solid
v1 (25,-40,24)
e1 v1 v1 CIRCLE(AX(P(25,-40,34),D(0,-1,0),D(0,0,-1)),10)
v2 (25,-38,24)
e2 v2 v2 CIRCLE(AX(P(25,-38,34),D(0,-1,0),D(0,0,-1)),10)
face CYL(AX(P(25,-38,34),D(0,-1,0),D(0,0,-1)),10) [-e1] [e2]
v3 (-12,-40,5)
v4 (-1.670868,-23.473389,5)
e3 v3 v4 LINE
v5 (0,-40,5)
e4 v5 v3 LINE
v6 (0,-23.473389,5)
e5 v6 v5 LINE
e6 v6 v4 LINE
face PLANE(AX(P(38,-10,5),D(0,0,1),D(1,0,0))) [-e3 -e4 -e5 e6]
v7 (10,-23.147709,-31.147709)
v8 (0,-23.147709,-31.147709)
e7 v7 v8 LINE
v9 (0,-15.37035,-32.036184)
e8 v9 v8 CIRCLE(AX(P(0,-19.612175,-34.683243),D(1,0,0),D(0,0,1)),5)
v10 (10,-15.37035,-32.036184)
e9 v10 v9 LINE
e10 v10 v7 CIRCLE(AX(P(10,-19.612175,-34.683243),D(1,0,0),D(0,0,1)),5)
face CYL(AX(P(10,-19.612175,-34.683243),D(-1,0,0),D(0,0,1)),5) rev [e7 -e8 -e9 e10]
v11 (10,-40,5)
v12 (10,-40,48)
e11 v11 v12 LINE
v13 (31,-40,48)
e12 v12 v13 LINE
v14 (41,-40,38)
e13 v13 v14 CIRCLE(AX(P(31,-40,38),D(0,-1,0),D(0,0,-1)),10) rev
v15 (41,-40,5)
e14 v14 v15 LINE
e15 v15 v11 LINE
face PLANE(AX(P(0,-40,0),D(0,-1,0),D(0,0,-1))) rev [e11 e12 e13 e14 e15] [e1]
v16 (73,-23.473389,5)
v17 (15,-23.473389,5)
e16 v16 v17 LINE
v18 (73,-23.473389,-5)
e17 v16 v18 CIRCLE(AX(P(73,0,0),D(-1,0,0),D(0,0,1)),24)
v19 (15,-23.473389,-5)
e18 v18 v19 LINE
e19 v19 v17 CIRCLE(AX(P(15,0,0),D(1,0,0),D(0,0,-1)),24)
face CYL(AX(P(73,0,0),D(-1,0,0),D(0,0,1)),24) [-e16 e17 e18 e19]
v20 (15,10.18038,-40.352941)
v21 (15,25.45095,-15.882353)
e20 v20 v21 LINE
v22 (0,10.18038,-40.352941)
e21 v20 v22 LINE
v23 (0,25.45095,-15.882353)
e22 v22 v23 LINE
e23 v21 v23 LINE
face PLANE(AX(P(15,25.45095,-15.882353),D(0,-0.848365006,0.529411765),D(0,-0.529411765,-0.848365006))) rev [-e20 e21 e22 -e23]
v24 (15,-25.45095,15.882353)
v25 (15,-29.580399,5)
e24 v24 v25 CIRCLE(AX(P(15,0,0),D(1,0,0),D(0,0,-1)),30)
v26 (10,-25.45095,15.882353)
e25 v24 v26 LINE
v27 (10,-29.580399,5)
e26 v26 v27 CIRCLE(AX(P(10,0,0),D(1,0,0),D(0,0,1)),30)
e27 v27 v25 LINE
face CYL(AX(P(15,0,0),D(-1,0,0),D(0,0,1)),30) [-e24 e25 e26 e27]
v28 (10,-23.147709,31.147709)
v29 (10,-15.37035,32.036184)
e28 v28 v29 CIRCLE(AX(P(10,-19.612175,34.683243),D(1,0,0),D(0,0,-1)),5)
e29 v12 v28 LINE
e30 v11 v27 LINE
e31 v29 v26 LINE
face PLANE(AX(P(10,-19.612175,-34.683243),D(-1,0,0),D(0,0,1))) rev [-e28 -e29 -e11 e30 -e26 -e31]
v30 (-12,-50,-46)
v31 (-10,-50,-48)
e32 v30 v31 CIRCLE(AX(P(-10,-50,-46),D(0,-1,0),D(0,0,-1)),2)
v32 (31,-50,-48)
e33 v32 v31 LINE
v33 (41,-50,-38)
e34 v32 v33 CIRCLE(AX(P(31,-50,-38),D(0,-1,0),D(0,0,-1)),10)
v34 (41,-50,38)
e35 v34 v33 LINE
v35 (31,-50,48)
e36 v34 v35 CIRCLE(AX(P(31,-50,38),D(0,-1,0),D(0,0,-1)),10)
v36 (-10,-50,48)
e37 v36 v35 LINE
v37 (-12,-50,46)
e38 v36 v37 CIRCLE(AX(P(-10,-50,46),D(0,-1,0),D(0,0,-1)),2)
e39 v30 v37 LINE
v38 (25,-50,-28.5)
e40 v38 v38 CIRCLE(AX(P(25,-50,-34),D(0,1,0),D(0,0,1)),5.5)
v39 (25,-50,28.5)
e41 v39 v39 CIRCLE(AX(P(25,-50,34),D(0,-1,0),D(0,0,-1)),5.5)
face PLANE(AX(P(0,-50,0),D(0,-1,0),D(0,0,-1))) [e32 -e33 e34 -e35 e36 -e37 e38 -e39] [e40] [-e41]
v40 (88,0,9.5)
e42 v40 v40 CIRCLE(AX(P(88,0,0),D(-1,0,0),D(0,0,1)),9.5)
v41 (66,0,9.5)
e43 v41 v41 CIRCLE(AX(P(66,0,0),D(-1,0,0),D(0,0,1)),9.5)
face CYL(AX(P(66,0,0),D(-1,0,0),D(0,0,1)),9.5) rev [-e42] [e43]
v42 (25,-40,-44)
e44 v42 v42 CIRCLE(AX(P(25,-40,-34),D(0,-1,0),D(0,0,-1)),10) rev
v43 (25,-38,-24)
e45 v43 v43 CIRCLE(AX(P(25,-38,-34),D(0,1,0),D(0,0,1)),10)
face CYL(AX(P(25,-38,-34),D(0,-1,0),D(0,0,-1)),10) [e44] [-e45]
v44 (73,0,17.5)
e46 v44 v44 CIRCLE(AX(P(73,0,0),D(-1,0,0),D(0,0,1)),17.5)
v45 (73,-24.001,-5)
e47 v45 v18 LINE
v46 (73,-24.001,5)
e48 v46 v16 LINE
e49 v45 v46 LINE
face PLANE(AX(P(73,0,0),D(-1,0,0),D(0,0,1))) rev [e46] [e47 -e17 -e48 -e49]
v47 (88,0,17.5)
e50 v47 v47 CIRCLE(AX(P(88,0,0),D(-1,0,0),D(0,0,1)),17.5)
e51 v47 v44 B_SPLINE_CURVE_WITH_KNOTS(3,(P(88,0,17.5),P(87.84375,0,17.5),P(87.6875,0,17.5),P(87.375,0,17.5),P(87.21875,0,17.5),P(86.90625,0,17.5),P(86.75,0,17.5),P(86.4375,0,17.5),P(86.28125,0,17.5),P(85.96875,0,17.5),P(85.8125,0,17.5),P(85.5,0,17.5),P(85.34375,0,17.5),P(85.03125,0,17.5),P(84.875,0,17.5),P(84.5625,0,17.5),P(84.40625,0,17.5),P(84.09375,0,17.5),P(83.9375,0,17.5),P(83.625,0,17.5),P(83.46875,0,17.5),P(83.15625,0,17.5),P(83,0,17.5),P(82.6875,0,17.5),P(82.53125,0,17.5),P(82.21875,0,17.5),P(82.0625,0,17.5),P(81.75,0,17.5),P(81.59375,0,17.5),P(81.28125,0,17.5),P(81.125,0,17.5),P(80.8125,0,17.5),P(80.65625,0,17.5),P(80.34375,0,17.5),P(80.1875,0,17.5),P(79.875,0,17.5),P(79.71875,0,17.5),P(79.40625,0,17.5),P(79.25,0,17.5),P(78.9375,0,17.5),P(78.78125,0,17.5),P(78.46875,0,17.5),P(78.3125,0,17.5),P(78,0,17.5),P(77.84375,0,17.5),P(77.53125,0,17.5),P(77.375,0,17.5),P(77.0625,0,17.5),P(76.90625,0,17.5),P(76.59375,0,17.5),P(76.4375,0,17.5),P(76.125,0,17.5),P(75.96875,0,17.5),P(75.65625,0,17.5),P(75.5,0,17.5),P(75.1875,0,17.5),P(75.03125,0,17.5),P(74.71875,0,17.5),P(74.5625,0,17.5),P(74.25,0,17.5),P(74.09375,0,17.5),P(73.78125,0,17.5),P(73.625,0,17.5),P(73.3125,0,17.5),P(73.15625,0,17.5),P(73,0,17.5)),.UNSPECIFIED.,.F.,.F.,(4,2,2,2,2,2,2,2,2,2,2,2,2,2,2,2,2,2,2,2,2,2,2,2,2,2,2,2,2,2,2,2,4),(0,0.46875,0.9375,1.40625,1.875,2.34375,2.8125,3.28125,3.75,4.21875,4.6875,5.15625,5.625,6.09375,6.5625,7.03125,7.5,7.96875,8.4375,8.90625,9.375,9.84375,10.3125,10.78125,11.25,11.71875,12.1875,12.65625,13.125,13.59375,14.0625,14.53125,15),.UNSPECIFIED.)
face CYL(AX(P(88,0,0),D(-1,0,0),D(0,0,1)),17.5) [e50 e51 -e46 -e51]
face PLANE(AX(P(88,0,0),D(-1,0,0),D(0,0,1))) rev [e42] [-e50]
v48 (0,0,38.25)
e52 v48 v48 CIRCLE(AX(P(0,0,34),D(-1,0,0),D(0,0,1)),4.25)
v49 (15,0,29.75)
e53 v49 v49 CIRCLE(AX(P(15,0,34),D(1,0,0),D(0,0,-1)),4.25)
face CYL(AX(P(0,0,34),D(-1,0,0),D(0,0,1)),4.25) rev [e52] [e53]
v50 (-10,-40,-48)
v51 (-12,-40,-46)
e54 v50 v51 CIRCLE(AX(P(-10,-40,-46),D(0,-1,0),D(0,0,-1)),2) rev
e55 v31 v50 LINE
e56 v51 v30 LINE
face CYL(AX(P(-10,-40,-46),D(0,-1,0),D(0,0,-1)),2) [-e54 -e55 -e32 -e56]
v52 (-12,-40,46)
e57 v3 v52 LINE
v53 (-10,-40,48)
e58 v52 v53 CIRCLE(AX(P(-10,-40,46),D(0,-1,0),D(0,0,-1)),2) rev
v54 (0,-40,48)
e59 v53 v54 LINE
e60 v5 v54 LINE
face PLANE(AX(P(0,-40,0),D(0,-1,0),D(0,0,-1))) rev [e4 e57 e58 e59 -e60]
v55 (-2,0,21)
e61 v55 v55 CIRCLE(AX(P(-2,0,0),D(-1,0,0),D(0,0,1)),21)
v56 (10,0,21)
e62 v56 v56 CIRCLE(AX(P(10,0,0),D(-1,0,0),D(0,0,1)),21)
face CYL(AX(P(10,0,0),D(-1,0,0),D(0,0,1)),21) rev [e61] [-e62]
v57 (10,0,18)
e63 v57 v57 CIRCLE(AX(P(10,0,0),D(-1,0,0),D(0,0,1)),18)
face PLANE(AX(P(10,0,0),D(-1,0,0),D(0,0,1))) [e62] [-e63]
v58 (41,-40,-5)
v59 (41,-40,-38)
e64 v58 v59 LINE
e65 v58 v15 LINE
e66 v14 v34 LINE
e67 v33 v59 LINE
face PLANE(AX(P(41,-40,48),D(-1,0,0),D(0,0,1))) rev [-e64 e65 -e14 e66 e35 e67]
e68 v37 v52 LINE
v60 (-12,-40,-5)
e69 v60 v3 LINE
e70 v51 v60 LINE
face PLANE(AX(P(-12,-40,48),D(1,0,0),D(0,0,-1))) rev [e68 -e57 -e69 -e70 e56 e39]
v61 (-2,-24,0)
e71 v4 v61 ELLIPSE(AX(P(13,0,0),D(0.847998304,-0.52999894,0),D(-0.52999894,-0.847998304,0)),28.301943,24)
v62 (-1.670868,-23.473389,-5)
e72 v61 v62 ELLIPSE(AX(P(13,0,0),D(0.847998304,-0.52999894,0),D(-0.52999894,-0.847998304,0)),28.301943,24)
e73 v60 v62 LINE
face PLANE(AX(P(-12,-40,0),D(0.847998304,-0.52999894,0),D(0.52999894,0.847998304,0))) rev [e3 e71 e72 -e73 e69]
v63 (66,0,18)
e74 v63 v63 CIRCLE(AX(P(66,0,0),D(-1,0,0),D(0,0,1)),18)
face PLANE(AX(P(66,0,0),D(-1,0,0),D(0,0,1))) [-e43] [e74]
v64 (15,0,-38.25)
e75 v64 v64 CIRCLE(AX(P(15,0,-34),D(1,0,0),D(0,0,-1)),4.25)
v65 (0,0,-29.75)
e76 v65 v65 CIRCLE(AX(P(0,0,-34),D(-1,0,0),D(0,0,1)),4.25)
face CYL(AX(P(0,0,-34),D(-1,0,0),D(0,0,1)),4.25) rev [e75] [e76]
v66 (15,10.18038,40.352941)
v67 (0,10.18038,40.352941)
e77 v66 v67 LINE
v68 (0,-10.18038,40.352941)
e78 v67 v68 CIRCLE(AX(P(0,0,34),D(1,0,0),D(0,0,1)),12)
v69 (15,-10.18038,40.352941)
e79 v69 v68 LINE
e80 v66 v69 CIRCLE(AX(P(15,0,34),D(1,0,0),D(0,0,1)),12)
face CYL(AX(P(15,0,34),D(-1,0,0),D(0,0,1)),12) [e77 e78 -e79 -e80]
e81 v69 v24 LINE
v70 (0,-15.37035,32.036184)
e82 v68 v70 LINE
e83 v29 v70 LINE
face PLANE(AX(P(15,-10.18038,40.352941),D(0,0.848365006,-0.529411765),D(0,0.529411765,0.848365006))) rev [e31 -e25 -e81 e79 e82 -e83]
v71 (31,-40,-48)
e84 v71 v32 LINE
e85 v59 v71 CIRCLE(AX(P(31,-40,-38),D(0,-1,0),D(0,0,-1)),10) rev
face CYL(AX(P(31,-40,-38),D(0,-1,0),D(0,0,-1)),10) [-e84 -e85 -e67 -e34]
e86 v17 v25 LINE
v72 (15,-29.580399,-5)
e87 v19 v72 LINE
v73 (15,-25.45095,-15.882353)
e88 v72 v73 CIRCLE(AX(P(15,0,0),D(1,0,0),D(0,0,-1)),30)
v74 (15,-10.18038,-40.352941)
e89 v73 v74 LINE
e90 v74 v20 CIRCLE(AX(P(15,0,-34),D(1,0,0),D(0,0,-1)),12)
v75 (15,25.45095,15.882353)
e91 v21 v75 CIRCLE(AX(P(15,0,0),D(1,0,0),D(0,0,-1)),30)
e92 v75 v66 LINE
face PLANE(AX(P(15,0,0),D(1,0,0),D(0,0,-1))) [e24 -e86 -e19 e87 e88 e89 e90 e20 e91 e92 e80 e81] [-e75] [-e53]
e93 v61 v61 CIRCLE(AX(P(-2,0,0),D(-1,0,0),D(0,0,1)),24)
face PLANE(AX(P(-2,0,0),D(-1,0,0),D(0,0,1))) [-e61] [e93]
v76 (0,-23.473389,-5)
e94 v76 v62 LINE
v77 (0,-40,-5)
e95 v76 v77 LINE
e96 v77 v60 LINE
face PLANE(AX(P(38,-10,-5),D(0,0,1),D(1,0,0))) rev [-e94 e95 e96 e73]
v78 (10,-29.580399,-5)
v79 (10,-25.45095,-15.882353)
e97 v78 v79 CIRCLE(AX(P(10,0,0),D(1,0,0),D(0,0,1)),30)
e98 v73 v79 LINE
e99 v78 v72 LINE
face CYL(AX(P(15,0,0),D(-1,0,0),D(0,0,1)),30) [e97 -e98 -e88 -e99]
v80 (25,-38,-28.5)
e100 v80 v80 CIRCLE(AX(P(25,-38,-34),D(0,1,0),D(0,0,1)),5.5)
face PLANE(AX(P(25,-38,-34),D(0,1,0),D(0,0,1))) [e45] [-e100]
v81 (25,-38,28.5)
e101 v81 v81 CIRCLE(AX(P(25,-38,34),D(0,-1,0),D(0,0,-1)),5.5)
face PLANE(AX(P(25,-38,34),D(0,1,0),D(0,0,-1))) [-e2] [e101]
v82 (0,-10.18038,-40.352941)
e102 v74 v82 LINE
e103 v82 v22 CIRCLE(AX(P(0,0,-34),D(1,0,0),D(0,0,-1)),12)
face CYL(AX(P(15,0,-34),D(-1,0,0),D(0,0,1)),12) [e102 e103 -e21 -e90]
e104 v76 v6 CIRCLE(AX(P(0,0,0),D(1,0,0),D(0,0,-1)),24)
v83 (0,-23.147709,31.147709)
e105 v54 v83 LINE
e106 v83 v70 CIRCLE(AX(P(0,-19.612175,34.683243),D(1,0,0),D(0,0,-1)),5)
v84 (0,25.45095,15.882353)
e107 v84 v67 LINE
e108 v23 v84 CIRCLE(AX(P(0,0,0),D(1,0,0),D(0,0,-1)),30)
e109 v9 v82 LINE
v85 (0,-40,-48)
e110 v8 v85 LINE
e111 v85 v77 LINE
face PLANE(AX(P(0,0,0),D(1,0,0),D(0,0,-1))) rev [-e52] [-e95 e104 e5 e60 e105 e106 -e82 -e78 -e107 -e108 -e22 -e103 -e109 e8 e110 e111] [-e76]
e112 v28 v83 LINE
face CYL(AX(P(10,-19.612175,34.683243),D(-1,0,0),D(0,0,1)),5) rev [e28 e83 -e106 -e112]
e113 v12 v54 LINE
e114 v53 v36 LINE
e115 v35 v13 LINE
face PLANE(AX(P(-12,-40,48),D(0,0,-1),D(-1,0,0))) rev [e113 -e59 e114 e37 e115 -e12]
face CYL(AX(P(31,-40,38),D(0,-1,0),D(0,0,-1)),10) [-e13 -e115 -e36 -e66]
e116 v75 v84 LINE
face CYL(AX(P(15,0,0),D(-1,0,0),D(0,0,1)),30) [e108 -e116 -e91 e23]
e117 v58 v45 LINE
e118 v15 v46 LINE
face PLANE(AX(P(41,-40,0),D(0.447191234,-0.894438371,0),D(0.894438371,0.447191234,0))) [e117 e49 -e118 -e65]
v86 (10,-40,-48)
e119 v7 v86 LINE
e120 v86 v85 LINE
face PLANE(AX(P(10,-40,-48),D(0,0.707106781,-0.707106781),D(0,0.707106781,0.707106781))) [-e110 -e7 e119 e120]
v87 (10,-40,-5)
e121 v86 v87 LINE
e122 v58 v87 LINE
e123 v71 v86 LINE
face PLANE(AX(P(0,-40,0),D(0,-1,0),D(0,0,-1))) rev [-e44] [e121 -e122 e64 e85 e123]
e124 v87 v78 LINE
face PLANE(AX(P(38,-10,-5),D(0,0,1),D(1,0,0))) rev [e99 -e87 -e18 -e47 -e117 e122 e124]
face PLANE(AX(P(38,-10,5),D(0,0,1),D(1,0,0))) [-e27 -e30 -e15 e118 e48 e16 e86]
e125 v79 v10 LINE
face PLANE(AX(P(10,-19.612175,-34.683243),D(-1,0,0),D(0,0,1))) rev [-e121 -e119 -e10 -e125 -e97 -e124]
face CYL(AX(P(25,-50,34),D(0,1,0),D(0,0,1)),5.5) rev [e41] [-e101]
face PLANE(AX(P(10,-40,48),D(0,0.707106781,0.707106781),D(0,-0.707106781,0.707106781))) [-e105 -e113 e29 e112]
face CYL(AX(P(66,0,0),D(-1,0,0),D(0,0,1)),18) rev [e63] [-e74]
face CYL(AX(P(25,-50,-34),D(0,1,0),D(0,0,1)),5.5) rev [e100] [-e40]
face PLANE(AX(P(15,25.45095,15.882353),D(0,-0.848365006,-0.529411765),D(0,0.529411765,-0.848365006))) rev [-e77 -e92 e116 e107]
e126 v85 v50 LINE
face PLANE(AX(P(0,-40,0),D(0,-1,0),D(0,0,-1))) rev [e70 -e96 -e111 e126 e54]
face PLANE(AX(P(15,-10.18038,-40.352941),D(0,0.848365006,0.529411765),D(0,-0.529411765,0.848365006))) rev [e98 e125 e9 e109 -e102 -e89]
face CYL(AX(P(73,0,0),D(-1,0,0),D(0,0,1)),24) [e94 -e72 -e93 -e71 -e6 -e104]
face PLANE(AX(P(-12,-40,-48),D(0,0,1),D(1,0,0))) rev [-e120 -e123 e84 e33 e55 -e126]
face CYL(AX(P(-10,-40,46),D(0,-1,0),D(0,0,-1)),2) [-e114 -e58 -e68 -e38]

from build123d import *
from OCP.BRepFilletAPI import BRepFilletAPI_MakeFillet

# Parameters (mm, degrees)
EXTRUDE_1_DEPTH      = 15
EXTRUDE_START        = 2
SKETCH_2_R           = 24
EXTRUDE_2_DEPTH      = 75
EXTRUDE_START_2      = -75
SKETCH_3_R           = 17.5
EXTRUDE_3_DEPTH      = 90
SKETCH_4_W           = 53
SKETCH_4_H           = 96
EXTRUDE_4_DEPTH      = 10
FILLET_1_R1          = 2
FILLET_1_R2          = 10
SKETCH_5_R           = 10
EXTRUDE_5_DEPTH      = 2
SKETCH_6_R           = 5.5
CUT_EXTRUDE_1_DEPTH  = 122.128031438
EXTRUDE_6_DEPTH      = 10
RIB_1_REACH          = 114.018
SKETCH_8_WALL_W      = 244.903673704
SKETCH_8_WALL_H      = 10
SKETCH_12_R          = 21
CUT_EXTRUDE_3_DEPTH  = 12
SKETCH_13_R          = 18
CUT_EXTRUDE_4_DEPTH  = 56
HOLE_WIZARD_G1_2_1_D = 19
HOLE_WIZARD_M10_1_D  = 8.5
RIB_START            = -5
RIB_13_DEPTH         = 10


with BuildPart() as part:
    # 草图1 → 凸台-拉伸1 (new body)
    with BuildSketch(Plane(origin=(0, 0, 0), x_dir=(0, 0, -1), z_dir=(1, 0, 0))):
        with BuildLine():
            Line((15.882352941, 25.45095018), (40.352941176, 10.180380072))
            ThreePointArc((40.352941176, 10.180380072), (46, 0), (40.352941176, -10.180380072))
            Line((40.352941176, -10.180380072), (15.882352941, -25.45095018))
            ThreePointArc((15.882352941, -25.45095018), (0, -30), (-15.882352941, -25.45095018))
            Line((-15.882352941, -25.45095018), (-40.352941176, -10.180380072))
            ThreePointArc((-40.352941176, -10.180380072), (-46, 0), (-40.352941176, 10.180380072))
            Line((-40.352941176, 10.180380072), (-15.882352941, 25.45095018))
            ThreePointArc((-15.882352941, 25.45095018), (0, 30), (15.882352941, 25.45095018))
        make_face()
    extrude(amount=EXTRUDE_1_DEPTH)

    # 草图2 → 凸台-拉伸2 (add)
    with BuildSketch(Plane.ZY.offset(EXTRUDE_START)):
        Circle(SKETCH_2_R)
    extrude(amount=-EXTRUDE_2_DEPTH)

    # 草图3 → 凸台-拉伸3 (add)
    with BuildSketch(Plane(origin=(73, 0, 0), x_dir=(0, 0, -1), z_dir=(1, 0, 0)).offset(EXTRUDE_START_2)):
        with Locations(Location((0, 0, 0), (0, 0, 180))):
            Circle(SKETCH_3_R)
    extrude(amount=EXTRUDE_3_DEPTH)



with BuildPart() as body_2:
    # 草图4 → 凸台-拉伸4 (new body)
    with BuildSketch(Plane(origin=(0, -50, 0), x_dir=(1, 0, 0), z_dir=(0, 1, 0))):
        with Locations((14.5, 0)):
            Rectangle(SKETCH_4_W, SKETCH_4_H)
    extrude(amount=EXTRUDE_4_DEPTH)

    # 圆角1: one fillet with a radius per group of edges: ONE call of the kernel's fillet builder (fillet() takes one radius for all edges)
    fillet_1_edges_1 = [body_2.edges().sort_by_distance(p)[0] for p in [
        (-12, -45, 48),
        (-12, -45, -48),
    ]]
    fillet_1_edges_2 = [body_2.edges().sort_by_distance(p)[0] for p in [
        (41, -45, -48),
        (41, -45, 48),
    ]]
    fillet_1 = BRepFilletAPI_MakeFillet(body_2.part.solid().wrapped)
    for e in fillet_1_edges_1:
        fillet_1.Add(FILLET_1_R1, e.wrapped)
    for e in fillet_1_edges_2:
        fillet_1.Add(FILLET_1_R2, e.wrapped)
    add(Compound.cast(fillet_1.Shape()), mode=Mode.REPLACE)

    # 草图5 → 凸台-拉伸5 (add)
    with BuildSketch(Plane(origin=(0, -40, 0), x_dir=(1, 0, 0), z_dir=(0, 1, 0))):
        with Locations(Location((25, 34, 0), (0, 0, 90))):
            Circle(SKETCH_5_R)
    extrude_5 = extrude(amount=EXTRUDE_5_DEPTH)

    # 草图6 → 切除-拉伸1 (cut, through all)
    with BuildSketch(Plane(origin=(0, -38, 0), x_dir=(1, 0, 0), z_dir=(0, 1, 0))):
        with Locations(Location((25, 34, 0), (0, 0, 270))):
            Circle(SKETCH_6_R)
    cut_extrude_1 = extrude(amount=-CUT_EXTRUDE_1_DEPTH, mode=Mode.SUBTRACT)

    # 镜向1: 凸台-拉伸5, 切除-拉伸1 across plane
    add(extrude_5.mirror(Plane.XY))
    add(cut_extrude_1.mirror(Plane.XY), mode=Mode.SUBTRACT)


with BuildPart() as part_1:
    add(part.part)

    add(body_2.part)  # 凸台-拉伸6 merges body 2
    # 草图7 → 凸台-拉伸6 (add)
    with BuildSketch(Plane.ZY):
        with BuildLine():
            Line((48, -40), (31.147709092, -23.147709092))
            ThreePointArc((31.147709092, -23.147709092), (29.715553271, -19.044672956), (32.036184174, -15.370350156))
            Line((32.036184174, -15.370350156), (15.882352941, -25.45095018))
            ThreePointArc((15.882352941, -25.45095018), (0, -30), (-15.882352941, -25.45095018))
            Line((-15.882352941, -25.45095018), (-32.036184174, -15.370350156))
            ThreePointArc((-32.036184174, -15.370350156), (-29.715553271, -19.044672956), (-31.147709092, -23.147709092))
            Line((-31.147709092, -23.147709092), (-48, -40))
            Line((-48, -40), (-46, -40))
            Line((-46, -40), (46, -40))
            Line((46, -40), (48, -40))
        make_face()
    extrude(amount=-EXTRUDE_6_DEPTH)

    # 草图8 wall → 筋1 (add, up to next)
    with BuildSketch(Plane(origin=(-7, -32, 0), x_dir=(0.529998940003, 0.847998304005, 0), z_dir=(-0.847998304005, 0.529998940003, 0)), mode=Mode.PRIVATE) as rib_1_sk1:
        Rectangle(SKETCH_8_WALL_W, SKETCH_8_WALL_H)
    rib_1_tool1 = extrude(rib_1_sk1.sketch, amount=-RIB_1_REACH, mode=Mode.PRIVATE) - part_1.part
    add(rib_1_tool1.solids().sort_by_distance((-7, -32, 0))[0])

    # 草图12 → 切除-拉伸3 (cut)
    with BuildSketch(Plane.ZY.offset(2)):
        Circle(SKETCH_12_R)
    extrude(amount=-CUT_EXTRUDE_3_DEPTH, mode=Mode.SUBTRACT)

    # 草图13 → 切除-拉伸4 (cut)
    with BuildSketch(Plane.ZY.offset(-10)):
        Circle(SKETCH_13_R)
    extrude(amount=-CUT_EXTRUDE_4_DEPTH, mode=Mode.SUBTRACT)

    # G1/2 螺纹孔1 (through all)
    with Locations(Plane.ZY.offset(-66)):
        with Locations((0, 0)):
            Hole(HOLE_WIZARD_G1_2_1_D / 2)

    # M10 螺纹孔1 (through all)
    with Locations(Plane.ZY):
        with Locations((34, 0), (-34, 0)):
            Hole(HOLE_WIZARD_M10_1_D / 2)

    # 筋13: read off the stored shape, not the designer's step
    # 筋13 outline → 筋13 (add)
    with BuildSketch(Plane.XY.offset(RIB_START)):
        Polygon((41, -40), (73, -24.001), (73, -23.473389189), (15, -23.473389189), (15, -29.580398915), (10, -29.580398915), (10, -40), align=None)
    extrude(amount=RIB_13_DEPTH)


solid = part_1.part
